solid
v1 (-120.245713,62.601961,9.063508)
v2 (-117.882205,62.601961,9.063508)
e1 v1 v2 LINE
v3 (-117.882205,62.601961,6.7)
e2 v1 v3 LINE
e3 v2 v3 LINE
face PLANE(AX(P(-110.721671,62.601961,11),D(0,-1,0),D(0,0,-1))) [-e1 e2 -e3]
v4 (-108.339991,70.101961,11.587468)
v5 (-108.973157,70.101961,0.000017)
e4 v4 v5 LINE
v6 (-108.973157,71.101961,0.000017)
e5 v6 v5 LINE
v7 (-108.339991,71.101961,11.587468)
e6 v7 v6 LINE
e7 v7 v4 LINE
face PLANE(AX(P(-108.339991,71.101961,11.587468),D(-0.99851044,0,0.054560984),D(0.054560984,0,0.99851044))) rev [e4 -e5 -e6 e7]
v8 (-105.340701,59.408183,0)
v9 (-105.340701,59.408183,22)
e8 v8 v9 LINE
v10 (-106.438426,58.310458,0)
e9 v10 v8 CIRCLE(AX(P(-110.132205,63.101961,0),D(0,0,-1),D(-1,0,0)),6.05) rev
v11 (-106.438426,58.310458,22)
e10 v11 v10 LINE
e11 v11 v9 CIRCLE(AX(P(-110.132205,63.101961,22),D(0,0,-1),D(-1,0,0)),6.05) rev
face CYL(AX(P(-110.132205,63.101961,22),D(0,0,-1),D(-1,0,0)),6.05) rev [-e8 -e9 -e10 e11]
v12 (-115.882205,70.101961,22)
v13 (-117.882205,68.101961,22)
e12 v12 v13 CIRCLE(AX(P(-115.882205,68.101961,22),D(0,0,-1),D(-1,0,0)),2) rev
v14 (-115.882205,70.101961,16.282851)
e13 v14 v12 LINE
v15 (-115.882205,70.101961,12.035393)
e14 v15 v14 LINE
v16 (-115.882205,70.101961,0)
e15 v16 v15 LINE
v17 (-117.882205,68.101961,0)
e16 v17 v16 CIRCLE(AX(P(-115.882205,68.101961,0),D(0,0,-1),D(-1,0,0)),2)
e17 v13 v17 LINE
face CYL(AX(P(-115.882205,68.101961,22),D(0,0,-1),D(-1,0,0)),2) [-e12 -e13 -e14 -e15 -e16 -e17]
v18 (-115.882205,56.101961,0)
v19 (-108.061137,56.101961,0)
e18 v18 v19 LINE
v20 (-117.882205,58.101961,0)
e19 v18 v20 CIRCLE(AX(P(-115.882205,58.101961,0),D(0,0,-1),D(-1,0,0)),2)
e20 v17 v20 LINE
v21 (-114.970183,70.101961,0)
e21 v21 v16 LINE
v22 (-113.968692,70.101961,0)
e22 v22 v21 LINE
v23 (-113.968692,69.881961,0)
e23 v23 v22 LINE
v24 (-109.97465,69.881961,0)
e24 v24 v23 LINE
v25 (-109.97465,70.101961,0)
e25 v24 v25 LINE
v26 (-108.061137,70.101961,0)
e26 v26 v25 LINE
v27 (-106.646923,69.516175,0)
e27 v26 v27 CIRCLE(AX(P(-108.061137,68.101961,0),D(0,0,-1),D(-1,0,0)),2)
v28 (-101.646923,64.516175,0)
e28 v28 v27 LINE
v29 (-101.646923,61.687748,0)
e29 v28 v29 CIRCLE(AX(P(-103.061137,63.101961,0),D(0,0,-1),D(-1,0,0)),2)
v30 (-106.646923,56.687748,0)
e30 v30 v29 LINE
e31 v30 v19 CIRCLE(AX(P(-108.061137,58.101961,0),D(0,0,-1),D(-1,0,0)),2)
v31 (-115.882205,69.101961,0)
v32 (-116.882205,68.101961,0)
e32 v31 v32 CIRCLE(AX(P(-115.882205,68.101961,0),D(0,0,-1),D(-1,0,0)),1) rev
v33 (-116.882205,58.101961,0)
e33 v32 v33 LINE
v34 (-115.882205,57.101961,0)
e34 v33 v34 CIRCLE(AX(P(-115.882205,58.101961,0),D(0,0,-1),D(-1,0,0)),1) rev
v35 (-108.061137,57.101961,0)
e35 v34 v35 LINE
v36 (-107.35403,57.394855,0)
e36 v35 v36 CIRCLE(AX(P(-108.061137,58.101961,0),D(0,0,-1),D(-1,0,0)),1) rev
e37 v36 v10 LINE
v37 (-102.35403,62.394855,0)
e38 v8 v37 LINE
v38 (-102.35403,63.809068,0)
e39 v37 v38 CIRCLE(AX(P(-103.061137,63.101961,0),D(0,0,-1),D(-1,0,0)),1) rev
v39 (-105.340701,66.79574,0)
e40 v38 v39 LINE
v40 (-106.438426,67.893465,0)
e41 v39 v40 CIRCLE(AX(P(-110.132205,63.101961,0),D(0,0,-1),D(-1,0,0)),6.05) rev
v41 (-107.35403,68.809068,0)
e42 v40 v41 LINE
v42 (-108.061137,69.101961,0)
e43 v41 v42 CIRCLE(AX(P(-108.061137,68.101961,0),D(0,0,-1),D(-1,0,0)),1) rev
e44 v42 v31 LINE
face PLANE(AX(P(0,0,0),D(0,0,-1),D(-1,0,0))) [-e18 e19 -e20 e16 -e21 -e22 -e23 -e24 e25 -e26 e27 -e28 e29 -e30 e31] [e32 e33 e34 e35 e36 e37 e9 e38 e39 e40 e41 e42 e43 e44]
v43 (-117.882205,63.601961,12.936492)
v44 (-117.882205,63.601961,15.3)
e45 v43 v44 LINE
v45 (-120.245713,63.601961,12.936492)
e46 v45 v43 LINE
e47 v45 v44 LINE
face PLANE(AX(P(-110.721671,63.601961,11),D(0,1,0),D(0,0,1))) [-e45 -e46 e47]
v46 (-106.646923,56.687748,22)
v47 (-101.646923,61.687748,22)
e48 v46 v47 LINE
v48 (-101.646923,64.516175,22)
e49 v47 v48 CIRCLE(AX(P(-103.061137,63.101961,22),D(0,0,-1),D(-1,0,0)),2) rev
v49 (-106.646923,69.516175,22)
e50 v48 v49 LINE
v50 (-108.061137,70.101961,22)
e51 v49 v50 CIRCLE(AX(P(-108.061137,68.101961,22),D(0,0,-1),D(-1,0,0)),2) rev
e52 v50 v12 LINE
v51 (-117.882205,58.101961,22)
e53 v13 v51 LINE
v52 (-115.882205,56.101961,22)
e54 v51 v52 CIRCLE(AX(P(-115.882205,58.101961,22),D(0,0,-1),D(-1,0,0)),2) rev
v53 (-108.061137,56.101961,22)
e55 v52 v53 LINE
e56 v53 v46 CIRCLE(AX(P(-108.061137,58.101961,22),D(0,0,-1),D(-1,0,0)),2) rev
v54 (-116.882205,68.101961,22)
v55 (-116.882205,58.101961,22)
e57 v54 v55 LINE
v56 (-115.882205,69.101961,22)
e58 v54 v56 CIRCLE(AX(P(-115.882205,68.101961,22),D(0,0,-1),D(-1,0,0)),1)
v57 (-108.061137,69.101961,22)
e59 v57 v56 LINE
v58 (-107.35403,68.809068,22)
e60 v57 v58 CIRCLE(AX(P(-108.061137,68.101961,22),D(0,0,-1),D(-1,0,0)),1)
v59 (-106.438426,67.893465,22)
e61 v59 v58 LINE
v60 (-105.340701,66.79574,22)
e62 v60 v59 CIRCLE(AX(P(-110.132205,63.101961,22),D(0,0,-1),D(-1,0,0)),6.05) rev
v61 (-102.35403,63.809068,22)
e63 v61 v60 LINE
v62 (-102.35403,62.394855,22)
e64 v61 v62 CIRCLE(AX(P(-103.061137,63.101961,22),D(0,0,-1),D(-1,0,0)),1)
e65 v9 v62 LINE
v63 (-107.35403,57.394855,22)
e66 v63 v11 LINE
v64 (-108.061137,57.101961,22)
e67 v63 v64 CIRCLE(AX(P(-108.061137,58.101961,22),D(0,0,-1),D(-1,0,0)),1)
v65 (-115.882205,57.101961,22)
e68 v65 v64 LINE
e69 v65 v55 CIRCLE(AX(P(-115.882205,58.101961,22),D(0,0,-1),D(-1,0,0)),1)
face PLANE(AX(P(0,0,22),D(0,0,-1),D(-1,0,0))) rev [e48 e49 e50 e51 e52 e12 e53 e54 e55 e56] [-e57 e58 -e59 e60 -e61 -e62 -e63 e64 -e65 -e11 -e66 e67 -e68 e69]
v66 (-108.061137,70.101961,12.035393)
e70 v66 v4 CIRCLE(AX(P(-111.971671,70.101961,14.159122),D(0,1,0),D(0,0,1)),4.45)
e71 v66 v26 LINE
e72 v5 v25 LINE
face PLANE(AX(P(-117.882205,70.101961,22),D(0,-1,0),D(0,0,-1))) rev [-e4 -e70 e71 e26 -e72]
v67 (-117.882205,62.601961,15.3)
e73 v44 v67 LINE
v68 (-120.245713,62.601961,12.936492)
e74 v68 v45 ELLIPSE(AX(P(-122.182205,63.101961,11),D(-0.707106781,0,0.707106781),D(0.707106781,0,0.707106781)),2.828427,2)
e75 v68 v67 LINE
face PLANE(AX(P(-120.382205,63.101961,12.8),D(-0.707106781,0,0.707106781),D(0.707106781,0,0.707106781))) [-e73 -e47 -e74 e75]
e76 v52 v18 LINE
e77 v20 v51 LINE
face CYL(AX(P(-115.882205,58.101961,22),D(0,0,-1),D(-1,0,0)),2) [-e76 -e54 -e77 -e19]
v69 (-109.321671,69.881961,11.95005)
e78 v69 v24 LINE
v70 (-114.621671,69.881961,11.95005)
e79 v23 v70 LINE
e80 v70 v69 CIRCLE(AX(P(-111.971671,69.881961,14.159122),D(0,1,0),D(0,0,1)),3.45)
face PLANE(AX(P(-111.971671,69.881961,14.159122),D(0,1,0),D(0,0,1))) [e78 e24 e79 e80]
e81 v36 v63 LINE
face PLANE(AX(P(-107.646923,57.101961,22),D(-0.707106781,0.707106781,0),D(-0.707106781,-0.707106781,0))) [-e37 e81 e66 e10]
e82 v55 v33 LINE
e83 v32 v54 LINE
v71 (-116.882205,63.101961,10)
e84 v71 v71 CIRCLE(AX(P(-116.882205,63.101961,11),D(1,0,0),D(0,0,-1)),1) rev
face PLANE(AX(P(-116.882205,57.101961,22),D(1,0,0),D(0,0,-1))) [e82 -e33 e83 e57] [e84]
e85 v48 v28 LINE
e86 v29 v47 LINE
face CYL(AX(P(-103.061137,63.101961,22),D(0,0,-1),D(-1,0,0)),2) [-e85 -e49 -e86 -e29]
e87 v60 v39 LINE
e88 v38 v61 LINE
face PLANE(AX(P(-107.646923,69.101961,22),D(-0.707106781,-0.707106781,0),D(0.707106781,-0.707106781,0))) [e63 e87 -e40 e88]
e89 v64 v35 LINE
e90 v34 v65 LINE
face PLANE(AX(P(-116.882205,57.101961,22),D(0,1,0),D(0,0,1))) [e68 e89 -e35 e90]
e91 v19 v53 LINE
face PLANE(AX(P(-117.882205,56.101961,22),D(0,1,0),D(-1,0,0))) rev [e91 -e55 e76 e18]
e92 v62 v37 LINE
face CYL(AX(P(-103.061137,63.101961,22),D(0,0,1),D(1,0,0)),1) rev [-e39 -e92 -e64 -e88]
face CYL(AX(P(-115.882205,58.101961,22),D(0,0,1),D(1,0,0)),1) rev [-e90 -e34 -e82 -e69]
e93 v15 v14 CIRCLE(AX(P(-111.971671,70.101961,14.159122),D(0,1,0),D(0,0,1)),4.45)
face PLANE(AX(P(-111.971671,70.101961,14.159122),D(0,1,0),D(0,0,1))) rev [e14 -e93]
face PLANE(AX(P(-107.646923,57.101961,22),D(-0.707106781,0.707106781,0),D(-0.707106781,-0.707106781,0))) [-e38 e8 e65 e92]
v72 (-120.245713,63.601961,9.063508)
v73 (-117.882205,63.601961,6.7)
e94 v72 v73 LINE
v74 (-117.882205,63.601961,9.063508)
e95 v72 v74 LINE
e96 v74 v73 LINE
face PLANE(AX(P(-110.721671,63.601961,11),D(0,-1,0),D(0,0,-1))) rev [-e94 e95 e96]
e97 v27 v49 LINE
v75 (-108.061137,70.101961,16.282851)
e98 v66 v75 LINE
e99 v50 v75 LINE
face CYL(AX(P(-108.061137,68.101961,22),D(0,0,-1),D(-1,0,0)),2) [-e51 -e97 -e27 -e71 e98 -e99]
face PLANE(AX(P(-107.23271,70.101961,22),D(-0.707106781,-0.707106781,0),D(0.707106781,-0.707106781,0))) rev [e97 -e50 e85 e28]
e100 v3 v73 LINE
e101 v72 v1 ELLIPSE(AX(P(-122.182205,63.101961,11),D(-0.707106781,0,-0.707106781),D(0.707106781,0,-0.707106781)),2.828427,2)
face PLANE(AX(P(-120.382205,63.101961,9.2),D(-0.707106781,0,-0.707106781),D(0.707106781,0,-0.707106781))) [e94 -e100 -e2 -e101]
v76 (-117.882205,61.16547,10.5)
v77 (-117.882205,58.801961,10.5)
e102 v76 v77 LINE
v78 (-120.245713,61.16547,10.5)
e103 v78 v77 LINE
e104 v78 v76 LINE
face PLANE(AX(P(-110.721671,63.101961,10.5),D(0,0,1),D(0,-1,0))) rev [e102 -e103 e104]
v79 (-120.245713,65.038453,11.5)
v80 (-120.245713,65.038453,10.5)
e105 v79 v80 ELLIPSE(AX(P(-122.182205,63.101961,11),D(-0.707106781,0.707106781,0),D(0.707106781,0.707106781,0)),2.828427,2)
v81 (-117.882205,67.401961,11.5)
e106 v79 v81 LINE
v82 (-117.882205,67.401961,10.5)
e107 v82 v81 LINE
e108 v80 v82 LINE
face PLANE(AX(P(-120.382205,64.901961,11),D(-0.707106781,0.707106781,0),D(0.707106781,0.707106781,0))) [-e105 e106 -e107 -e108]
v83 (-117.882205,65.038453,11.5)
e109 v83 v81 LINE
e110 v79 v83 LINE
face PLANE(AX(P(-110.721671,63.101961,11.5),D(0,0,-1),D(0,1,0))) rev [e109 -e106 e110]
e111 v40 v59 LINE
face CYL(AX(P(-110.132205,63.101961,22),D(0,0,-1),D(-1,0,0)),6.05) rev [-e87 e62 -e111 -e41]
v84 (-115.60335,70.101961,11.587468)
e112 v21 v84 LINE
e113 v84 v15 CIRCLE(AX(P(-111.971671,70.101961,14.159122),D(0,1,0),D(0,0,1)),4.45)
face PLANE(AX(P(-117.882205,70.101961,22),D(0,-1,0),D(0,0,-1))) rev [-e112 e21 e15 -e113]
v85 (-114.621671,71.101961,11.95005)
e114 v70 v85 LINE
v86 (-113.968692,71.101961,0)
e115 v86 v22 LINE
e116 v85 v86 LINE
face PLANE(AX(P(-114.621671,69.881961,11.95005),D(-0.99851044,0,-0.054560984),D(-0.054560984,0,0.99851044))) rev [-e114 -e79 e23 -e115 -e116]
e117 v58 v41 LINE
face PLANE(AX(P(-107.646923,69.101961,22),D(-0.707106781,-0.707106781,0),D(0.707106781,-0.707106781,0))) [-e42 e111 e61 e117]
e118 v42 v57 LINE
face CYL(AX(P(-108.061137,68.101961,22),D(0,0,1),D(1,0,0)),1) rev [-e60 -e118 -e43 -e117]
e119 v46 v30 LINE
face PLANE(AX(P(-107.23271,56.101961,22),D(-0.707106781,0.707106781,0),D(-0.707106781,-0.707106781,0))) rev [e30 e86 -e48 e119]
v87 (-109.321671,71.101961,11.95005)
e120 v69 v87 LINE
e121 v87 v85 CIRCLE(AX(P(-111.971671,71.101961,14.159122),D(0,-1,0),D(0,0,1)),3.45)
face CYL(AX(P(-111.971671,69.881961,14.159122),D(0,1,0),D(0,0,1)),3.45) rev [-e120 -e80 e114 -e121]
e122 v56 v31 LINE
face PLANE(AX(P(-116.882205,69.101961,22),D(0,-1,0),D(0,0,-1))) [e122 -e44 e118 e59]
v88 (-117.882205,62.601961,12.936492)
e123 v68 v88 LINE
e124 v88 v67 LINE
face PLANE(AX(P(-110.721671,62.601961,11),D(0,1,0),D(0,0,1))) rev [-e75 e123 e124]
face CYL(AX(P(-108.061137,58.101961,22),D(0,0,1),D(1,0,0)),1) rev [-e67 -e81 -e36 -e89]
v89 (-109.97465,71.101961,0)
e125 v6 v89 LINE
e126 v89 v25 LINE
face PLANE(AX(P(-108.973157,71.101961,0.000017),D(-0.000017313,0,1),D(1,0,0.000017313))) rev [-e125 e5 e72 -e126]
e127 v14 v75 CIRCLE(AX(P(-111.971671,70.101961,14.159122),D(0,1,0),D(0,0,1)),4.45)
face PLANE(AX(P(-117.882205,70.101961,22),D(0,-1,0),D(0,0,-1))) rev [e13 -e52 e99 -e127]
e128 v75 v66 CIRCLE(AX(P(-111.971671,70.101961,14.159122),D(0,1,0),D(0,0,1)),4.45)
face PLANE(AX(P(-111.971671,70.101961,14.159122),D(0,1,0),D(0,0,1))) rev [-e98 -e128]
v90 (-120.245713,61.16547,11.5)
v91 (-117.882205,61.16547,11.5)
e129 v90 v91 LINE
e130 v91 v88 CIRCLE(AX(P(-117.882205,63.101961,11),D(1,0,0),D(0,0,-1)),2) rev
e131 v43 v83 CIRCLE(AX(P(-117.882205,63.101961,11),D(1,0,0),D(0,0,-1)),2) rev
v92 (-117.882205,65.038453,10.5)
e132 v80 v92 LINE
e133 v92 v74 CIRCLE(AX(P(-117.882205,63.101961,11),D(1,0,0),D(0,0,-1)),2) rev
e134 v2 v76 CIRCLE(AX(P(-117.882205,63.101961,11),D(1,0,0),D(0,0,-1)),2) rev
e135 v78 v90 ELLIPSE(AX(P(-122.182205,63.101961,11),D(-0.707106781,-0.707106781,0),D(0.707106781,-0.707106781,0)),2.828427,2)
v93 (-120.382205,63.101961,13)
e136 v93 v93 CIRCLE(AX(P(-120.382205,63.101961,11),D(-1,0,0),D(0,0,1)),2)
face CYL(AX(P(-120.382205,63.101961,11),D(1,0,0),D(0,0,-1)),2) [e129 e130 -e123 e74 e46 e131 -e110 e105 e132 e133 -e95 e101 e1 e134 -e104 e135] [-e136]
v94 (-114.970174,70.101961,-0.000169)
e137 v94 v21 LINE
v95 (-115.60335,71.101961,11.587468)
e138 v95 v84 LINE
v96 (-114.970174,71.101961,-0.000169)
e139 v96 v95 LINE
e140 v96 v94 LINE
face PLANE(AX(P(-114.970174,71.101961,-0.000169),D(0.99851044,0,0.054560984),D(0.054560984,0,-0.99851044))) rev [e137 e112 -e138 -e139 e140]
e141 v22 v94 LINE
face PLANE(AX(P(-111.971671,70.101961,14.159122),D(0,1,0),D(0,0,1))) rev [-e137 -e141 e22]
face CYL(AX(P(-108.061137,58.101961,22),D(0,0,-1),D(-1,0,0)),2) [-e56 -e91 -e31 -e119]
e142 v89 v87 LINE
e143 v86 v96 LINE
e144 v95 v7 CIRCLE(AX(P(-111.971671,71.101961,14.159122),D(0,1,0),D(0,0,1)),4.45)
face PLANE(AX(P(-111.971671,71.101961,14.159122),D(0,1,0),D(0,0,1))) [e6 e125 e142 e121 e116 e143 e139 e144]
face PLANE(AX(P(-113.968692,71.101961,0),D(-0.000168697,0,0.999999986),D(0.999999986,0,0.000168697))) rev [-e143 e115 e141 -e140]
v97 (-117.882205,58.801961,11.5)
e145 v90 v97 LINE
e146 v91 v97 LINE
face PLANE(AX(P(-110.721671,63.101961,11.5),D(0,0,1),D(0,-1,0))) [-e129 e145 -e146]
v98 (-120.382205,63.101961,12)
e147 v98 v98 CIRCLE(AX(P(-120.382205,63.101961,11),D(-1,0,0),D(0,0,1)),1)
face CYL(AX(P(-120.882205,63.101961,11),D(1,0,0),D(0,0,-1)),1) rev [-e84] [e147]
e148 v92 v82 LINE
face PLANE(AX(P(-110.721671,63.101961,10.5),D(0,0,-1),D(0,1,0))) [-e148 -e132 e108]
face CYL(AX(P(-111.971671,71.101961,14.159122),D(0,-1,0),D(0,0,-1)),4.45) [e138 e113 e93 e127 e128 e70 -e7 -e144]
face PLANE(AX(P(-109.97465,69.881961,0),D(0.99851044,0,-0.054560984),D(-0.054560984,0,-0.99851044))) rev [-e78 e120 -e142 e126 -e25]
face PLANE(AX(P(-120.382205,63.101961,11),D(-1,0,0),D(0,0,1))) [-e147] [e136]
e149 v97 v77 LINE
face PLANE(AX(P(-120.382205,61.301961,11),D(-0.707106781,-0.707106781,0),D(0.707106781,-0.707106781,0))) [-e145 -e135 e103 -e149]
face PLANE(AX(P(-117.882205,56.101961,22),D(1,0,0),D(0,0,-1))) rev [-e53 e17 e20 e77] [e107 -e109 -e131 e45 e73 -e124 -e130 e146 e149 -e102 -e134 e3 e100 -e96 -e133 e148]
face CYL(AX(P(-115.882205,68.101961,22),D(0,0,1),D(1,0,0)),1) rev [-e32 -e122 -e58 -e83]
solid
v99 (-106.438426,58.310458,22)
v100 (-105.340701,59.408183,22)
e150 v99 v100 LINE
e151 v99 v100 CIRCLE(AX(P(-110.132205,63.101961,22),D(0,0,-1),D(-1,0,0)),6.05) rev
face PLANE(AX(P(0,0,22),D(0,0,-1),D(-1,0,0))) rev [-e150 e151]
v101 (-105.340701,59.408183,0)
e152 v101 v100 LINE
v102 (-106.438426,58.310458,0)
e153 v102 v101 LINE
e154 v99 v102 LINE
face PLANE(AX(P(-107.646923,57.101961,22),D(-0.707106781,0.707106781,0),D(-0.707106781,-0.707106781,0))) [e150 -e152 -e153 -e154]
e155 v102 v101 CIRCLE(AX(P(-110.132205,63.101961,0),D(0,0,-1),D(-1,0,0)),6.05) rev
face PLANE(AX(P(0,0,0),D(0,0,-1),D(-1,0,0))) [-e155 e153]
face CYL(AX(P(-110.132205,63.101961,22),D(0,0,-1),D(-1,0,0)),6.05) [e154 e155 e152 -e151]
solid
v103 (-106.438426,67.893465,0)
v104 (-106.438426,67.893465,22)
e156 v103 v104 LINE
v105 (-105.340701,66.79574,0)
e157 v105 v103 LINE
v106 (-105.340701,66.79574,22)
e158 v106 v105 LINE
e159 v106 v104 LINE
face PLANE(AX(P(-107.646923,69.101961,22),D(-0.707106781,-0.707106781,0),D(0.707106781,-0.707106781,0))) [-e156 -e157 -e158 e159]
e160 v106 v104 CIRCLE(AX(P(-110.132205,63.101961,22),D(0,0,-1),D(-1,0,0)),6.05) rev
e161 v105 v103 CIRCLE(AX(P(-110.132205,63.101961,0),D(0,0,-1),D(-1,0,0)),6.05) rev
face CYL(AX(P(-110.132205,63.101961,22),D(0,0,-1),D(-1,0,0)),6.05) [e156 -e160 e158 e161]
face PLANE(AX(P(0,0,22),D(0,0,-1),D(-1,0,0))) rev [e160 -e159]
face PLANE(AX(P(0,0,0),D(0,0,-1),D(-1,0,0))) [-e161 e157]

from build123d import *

# Parameters (mm, degrees)
BOSS_EXTRU_1_DEPTH           = 22
CONG_1_R                     = 1
CONG_2_R                     = 2
ENL_V_MAT_EXTRU_2_DEPTH      = 3
ENL_V_MAT_EXTRU_2_DEPTH_BACK = 2
ESQUISSE3_R                  = 1
ENL_V_MAT_EXTRU_5_DEPTH      = 0.22
BOSS_EXTRU_3_START           = 2.5
ESQUISSE8_R                  = 2
ESQUISSE8_R_2                = 1
BOSS_EXTRU_3_DEPTH           = 2.5
NERVURE2_REACH               = 124.576
ESQUISSE13_WALL_W            = 250.687529102
ESQUISSE13_WALL_H            = 1
R_P_TITION_CIRCULAIRE1_COUNT = 4
BOSS_EXTRU_6_START           = 1
BOSS_EXTRU_6_DEPTH           = 1
FRACTIONNER1_DEPTH           = 22
FRACTIONNER1_2_DEPTH         = 22
FRACTIONNER1_3_DEPTH         = 22


# Read off the part's stored shape, not the designer's step: Fractionner1
with BuildPart() as part:
    # Esquisse1 → Boss.-Extru.1 (new body)
    with BuildSketch(Plane.XY):
        Polygon((-117.882204612, 56.101961411), (-107.232709675, 56.101961411), (-100.232709675, 63.101961411), (-107.232709675, 70.101961411), (-117.882204612, 70.101961411), align=None)
        Polygon((-116.882204612, 57.101961411), (-107.646923238, 57.101961411), (-101.646923238, 63.101961411), (-107.646923238, 69.101961411), (-116.882204612, 69.101961411), align=None, mode=Mode.SUBTRACT)
    extrude(amount=BOSS_EXTRU_1_DEPTH)

    # Congé1
    cong_1_edges = [part.edges().sort_by_distance(p)[0] for p in [
        (-116.882204612, 69.101961411, 11),
        (-116.882204612, 57.101961411, 11),
        (-107.646923238, 57.101961411, 11),
        (-101.646923238, 63.101961411, 11),
        (-107.646923238, 69.101961411, 11),
    ]]
    fillet(cong_1_edges, radius=CONG_1_R)

    # Congé2
    cong_2_edges = [part.edges().sort_by_distance(p)[0] for p in [
        (-117.882204612, 70.101961411, 11),
        (-107.232709675, 70.101961411, 11),
        (-100.232709675, 63.101961411, 11),
        (-107.232709675, 56.101961411, 11),
        (-117.882204612, 56.101961411, 11),
    ]]
    fillet(cong_2_edges, radius=CONG_2_R)

    # Esquisse3 → Enlèv. mat.-Extru.2 (cut, two sides: drawn at the far end of the back side and taken through both)
    with BuildSketch(Plane.ZY.offset(117.882204612).offset(-ENL_V_MAT_EXTRU_2_DEPTH_BACK)):
        with Locations(Location((11, 63.101961411, 0), (0, 0, 180))):
            Circle(ESQUISSE3_R)
    extrude(amount=ENL_V_MAT_EXTRU_2_DEPTH + ENL_V_MAT_EXTRU_2_DEPTH_BACK, mode=Mode.SUBTRACT)

    # Esquisse6 → Enlèv. mat.-Extru.5 (cut)
    with BuildSketch(Plane(origin=(0, 70.101961411, 0), x_dir=(1, 0, 0), z_dir=(0, 1, 0))):
        with BuildLine():
            Line((-109.974649826, 0), (-109.321670706, -11.950049764))
            ThreePointArc((-109.321670706, -11.950049764), (-111.971670706, -17.609121967), (-114.621670706, -11.950049764))
            Line((-114.621670706, -11.950049764), (-113.968691586, 0))
            Line((-113.968691586, 0), (-109.974649826, 0))
        make_face()
    extrude(amount=-ENL_V_MAT_EXTRU_5_DEPTH, mode=Mode.SUBTRACT)

    # Esquisse8 → Boss.-Extru.3 (add)
    with BuildSketch(Plane.ZY.offset(117.882204612).offset(BOSS_EXTRU_3_START)):
        with Locations(Location((11, 63.101961411, 0), (0, 0, 180))):
            Circle(ESQUISSE8_R)
        with Locations(Location((11, 63.101961411, 0), (0, 0, 180))):
            Circle(ESQUISSE8_R_2, mode=Mode.SUBTRACT)
    extrude(amount=-BOSS_EXTRU_3_DEPTH)

    # Esquisse13 wall → Nervure2 (add, up to next)
    with BuildSketch(Plane(origin=(-119.132204612, 63.101961411, 14.05), x_dir=(0.707106781187, 0, 0.707106781187), z_dir=(0.707106781187, 0, -0.707106781187)), mode=Mode.PRIVATE) as nervure2_sk1:
        Rectangle(ESQUISSE13_WALL_W, ESQUISSE13_WALL_H)
    nervure2_tool1 = extrude(nervure2_sk1.sketch, amount=NERVURE2_REACH, mode=Mode.PRIVATE) - part.part
    nervure2 = nervure2_tool1.solids().sort_by_distance((-119.132204612, 63.101961411, 14.05))[0]
    add(nervure2)

    # Répétition circulaire1: Nervure2 ×4 about axis
    r_p_tition_circulaire1_axis = Axis((0, 63.101961411, 11), (1, 0, 0))
    for i in range(1, R_P_TITION_CIRCULAIRE1_COUNT):
        add(nervure2.rotate(r_p_tition_circulaire1_axis, i * 360 / R_P_TITION_CIRCULAIRE1_COUNT))

    # Esquisse17 → Boss.-Extru.6 (add)
    with BuildSketch(Plane(origin=(0, 70.101961411, 0), x_dir=(1, 0, 0), z_dir=(0, 1, 0)).offset(BOSS_EXTRU_6_START)):
        with BuildLine():
            Line((-113.968691586, 0), (-114.970174136, 0.000168947))
            Line((-114.970174136, 0.000168947), (-115.603350156, -11.587467952))
            ThreePointArc((-115.603350156, -11.587467952), (-111.971670706, -18.609121967), (-108.339991256, -11.587467952))
            Line((-108.339991256, -11.587467952), (-108.973157096, -1.7339e-05))
            Line((-108.973157096, -1.7339e-05), (-109.974649826, 0))
            Line((-109.974649826, 0), (-109.321670706, -11.950049764))
            ThreePointArc((-109.321670706, -11.950049764), (-111.971670706, -17.609121967), (-114.621670706, -11.950049764))
            Line((-114.621670706, -11.950049764), (-113.968691586, 0))
        make_face()
    extrude(amount=-BOSS_EXTRU_6_DEPTH)

    # Fractionner1 3 outline → Fractionner1 3 (cut)
    with BuildSketch(Plane.XY):
        with BuildLine():
            ThreePointArc((-106.438426385, 58.310458264), (-105.854208586, 58.823965385), (-105.340701465, 59.408183184))
            Line((-105.340701465, 59.408183184), (-106.438426385, 58.310458264))
        make_face()
        with BuildLine():
            ThreePointArc((-105.340701465, 66.795739638), (-105.854208586, 67.379957437), (-106.438426385, 67.893464558))
            Line((-106.438426385, 67.893464558), (-105.340701465, 66.795739638))
        make_face()
    extrude(amount=FRACTIONNER1_3_DEPTH, mode=Mode.SUBTRACT)


with BuildPart() as body_2:
    # Fractionner1 outline → Fractionner1 (new body)
    with BuildSketch(Plane.XY):
        with BuildLine():
            ThreePointArc((-106.438426385, 58.310458264), (-105.854208586, 58.823965385), (-105.340701465, 59.408183184))
            Line((-105.340701465, 59.408183184), (-106.438426385, 58.310458264))
        make_face()
    extrude(amount=FRACTIONNER1_DEPTH)


with BuildPart() as body_3:
    # Fractionner1 2 outline → Fractionner1 2 (new body)
    with BuildSketch(Plane.XY):
        with BuildLine():
            ThreePointArc((-105.340701465, 66.795739638), (-105.854208586, 67.379957437), (-106.438426385, 67.893464558))
            Line((-106.438426385, 67.893464558), (-105.340701465, 66.795739638))
        make_face()
    extrude(amount=FRACTIONNER1_2_DEPTH)


solid = Compound([part.part, body_2.part, body_3.part])
